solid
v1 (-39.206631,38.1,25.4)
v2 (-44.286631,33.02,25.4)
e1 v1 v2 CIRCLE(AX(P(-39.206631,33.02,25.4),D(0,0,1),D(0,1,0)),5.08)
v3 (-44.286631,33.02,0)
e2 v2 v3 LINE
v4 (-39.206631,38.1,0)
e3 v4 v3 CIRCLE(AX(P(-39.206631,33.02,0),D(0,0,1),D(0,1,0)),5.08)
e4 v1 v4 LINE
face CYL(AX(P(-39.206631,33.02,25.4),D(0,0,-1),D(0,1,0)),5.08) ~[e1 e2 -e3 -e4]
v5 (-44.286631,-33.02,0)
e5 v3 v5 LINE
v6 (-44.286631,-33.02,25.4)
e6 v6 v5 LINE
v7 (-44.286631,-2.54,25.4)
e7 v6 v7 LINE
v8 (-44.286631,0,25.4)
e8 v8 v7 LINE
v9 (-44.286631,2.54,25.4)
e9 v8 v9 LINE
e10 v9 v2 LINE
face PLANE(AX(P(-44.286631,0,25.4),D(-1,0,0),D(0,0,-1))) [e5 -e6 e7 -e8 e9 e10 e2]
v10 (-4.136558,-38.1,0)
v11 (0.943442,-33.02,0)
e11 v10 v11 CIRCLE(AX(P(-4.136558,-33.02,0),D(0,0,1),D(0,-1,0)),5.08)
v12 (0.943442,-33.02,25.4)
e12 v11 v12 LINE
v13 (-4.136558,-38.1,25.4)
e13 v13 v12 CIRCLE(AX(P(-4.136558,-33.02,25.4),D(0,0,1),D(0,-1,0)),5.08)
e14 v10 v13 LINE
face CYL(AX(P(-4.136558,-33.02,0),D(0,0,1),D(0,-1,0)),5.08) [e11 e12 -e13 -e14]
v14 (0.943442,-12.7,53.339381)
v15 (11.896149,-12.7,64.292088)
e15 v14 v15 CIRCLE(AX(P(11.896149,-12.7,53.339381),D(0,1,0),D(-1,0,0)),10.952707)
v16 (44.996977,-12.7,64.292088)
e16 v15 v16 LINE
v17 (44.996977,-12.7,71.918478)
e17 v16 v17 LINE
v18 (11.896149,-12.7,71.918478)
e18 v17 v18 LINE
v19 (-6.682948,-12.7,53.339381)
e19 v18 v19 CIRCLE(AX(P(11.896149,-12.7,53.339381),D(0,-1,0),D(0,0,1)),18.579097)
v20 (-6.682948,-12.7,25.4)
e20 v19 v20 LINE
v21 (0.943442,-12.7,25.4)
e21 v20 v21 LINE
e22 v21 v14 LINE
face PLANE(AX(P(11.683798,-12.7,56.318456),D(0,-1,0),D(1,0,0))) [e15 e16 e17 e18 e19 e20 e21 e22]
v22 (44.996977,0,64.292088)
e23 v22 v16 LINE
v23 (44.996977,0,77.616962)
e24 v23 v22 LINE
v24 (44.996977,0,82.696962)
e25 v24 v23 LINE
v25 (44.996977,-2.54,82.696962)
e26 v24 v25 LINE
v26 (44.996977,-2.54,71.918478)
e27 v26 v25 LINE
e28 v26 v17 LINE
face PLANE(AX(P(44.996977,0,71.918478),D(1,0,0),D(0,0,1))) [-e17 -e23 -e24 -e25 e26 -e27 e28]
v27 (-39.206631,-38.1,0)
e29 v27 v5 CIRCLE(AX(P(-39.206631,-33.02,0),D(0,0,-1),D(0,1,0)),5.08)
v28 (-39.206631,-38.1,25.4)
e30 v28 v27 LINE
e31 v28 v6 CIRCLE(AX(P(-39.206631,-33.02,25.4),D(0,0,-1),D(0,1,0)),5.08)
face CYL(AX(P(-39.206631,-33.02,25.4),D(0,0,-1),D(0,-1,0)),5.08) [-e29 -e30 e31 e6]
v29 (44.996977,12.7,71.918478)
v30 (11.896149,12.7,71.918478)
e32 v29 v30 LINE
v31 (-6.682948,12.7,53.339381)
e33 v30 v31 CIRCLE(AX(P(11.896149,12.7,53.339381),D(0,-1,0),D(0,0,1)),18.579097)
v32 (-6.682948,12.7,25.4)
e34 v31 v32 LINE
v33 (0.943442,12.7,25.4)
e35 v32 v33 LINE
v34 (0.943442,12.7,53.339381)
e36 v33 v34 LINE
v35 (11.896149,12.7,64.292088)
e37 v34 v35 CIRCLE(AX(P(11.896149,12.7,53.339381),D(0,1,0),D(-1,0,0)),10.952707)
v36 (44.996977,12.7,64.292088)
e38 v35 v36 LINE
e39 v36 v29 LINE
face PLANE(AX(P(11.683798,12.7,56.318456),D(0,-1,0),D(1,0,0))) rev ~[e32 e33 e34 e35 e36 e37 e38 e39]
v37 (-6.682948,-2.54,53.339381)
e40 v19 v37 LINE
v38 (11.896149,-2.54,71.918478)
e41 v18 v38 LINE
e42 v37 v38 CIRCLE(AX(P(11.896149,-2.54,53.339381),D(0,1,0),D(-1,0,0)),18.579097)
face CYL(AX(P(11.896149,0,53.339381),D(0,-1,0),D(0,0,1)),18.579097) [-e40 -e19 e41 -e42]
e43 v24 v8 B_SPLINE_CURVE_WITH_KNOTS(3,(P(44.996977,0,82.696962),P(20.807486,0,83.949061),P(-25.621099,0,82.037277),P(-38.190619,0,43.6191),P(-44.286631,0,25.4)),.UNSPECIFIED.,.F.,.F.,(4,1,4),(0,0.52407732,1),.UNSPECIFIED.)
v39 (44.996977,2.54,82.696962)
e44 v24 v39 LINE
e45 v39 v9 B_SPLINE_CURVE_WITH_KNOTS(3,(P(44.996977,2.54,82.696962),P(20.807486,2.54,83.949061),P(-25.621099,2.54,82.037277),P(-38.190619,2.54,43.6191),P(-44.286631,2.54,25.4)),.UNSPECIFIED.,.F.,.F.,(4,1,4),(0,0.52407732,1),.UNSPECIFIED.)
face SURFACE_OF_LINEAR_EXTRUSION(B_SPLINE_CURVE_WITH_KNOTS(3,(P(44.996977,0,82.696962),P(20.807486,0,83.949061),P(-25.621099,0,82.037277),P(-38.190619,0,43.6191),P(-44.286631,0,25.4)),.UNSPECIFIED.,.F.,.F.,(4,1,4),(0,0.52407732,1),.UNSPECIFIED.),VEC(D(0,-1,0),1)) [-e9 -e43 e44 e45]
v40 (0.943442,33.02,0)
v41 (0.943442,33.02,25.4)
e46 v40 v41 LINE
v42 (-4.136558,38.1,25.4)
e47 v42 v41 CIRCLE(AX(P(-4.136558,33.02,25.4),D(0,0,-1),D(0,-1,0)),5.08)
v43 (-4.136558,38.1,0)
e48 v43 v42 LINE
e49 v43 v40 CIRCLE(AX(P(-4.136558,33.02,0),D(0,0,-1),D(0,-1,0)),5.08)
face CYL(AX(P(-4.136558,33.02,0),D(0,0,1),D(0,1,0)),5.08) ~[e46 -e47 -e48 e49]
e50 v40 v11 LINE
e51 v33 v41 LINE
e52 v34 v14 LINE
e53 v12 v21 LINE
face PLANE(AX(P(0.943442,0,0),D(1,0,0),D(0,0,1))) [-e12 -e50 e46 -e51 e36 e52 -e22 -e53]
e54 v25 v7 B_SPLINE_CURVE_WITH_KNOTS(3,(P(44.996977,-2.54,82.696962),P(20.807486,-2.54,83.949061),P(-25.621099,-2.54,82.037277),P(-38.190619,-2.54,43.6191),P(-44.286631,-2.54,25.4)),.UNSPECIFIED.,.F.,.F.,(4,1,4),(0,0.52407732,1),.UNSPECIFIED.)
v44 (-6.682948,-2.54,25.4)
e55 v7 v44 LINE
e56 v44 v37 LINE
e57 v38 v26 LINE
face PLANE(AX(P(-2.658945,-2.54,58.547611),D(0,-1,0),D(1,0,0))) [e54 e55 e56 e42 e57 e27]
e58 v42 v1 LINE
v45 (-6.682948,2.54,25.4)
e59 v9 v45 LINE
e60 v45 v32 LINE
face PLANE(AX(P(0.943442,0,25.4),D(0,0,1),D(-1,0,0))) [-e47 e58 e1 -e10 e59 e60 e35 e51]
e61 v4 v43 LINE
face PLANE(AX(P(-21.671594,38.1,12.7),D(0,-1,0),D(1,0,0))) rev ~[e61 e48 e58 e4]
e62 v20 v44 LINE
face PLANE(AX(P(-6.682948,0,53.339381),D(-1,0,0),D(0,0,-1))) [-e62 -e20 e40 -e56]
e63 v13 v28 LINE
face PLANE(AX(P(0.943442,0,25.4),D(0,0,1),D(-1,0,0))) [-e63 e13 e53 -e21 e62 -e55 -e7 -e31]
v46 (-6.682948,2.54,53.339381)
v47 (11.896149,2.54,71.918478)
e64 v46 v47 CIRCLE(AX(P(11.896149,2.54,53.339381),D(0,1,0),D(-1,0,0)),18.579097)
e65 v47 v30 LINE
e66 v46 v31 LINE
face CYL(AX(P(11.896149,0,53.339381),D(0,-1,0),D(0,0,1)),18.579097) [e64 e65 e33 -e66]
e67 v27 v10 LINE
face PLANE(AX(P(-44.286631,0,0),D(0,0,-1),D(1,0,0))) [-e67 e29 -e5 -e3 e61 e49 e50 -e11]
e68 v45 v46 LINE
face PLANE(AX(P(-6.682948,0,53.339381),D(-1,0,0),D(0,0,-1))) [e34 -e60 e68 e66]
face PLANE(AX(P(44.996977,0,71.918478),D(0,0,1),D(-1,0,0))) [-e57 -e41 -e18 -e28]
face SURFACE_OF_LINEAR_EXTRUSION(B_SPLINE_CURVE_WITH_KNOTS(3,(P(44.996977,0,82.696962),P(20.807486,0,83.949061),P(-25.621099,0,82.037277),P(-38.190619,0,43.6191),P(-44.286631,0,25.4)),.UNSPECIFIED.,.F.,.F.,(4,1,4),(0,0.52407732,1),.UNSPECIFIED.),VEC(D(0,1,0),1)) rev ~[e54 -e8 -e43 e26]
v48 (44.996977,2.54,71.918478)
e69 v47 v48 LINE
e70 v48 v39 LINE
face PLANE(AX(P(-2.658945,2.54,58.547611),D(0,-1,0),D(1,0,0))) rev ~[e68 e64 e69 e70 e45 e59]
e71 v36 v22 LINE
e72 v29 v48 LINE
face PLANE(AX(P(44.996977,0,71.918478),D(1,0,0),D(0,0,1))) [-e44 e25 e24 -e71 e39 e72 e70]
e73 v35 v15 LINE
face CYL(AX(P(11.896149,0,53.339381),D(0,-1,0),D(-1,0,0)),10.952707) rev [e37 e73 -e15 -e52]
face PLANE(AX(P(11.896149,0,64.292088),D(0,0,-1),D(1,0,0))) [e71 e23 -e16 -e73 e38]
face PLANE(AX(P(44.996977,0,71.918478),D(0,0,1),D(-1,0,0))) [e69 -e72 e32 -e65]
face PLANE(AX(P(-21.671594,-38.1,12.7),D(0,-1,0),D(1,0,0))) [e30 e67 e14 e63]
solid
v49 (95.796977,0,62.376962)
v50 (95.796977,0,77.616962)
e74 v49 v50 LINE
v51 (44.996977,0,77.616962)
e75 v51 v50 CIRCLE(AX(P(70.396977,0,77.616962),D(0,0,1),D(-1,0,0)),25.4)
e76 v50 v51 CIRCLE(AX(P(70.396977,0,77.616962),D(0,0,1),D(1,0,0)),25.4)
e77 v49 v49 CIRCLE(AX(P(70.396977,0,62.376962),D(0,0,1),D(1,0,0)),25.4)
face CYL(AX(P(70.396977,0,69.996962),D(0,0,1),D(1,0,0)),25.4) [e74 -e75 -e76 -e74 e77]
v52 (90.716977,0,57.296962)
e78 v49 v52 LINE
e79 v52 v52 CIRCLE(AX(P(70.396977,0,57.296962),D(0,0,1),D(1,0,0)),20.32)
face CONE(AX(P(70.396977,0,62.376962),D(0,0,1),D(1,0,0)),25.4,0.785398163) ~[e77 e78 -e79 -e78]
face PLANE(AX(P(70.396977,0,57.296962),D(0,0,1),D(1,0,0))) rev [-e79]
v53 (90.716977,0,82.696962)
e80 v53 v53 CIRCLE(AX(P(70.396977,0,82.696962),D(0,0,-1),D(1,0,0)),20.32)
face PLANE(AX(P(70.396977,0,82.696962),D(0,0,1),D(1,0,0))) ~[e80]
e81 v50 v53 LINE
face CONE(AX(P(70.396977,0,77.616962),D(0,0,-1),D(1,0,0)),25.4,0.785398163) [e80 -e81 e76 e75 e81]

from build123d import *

# Parameters (mm, degrees)
F1_DEPTH    = 38.1
F2_DEPTH    = 2.54
F0_W        = 25.4
F0_H        = 25.4
F4_DEPTH    = 12.7
F5_R        = 5.08
F6_T2_ANGLE = 180
F6_T4_ANGLE = 180


# Not quite as in the source:
# - a fillet or chamfer that OpenCascade refuses, or shapes differently, is made with other operations: its cross-section is extruded or revolved along the edge and cut away or added


with BuildPart() as f1:
    # F0 (on Front) → F1 (new body, symmetric)
    with BuildSketch(Plane.XZ):
        Polygon((-44.2866310477, 25.4), (-44.2866310477, 0), (0.9434421729, 0), (0.9434421729, 25.4), (-6.6829477437, 25.4), align=None)
    extrude(amount=F1_DEPTH, both=True)

    # F0 (on Front) → F2 (join, symmetric)
    with BuildSketch(Plane.XZ):
        with BuildLine():
            add(Edge.make_bspline(
                [(44.9969768524, 82.6969615459), (20.8074855996, 83.9490606701), (-25.6210994511, 82.0372772331), (-38.1906192957, 43.6191001085), (-44.2866310477, 25.4)],
                knots=[0, 0, 0, 0, 0.5240773197, 1, 1, 1, 1], degree=3))
            Line((-44.2866310477, 25.4), (-6.6829477437, 25.4))
            Line((-6.6829477437, 25.4), (-6.6829477437, 53.3393811594))
            ThreePointArc((-6.6829477437, 53.3393811594), (-1.2412562476, 66.4767865715), (11.8961491644, 71.9184780675))
            Line((11.8961491644, 71.9184780675), (44.9969768524, 71.9184780675))
            Line((44.9969768524, 71.9184780675), (44.9969768524, 82.6969615459))
        make_face()
    extrude(amount=F2_DEPTH, both=True)

    # F0 (on Front) → F3 (revolve)
    with BuildSketch(Plane.XZ):
        with Locations((83.0969768524, 69.9969615459)):
            Rectangle(F0_W, F0_H)
    revolve(axis=Axis((70.3969768524, 0, 69.9969615459), (0, 0, 1)))

    # F0 (on Front) → F4 (join, symmetric)
    with BuildSketch(Plane.XZ):
        with BuildLine():
            Line((-6.6829477437, 25.4), (0.9434421729, 25.4))
            Line((0.9434421729, 25.4), (0.9434421729, 53.3393811594))
            ThreePointArc((0.9434421729, 53.3393811594), (4.1514157783, 61.0841145455), (11.8961491644, 64.292088151))
            Line((11.8961491644, 64.292088151), (44.9969768524, 64.292088151))
            Line((44.9969768524, 64.292088151), (44.9969768524, 71.9184780675))
            Line((44.9969768524, 71.9184780675), (11.8961491644, 71.9184780675))
            ThreePointArc((11.8961491644, 71.9184780675), (-1.2412562476, 66.4767865715), (-6.6829477437, 53.3393811594))
            Line((-6.6829477437, 53.3393811594), (-6.6829477437, 25.4))
        make_face()
    extrude(amount=F4_DEPTH, both=True)

    # F5
    f5_edges = [f1.edges().sort_by_distance(p)[0] for p in [
        (-44.286631, -38.1, 12.7),
        (0.943442, -38.1, 12.7),
        (0.943442, 38.1, 12.7),
        (-44.286631, 38.1, 12.7),
    ]]
    fillet(f5_edges, radius=F5_R)

    # F6: chamfer of 5.08 on 3 edges, made by hand

    # F6_s1 → F6_t2 (revolve, cut)
    with BuildSketch(Plane.XZ):
        Polygon((95.7969768524, 77.6169615459), (90.7169768524, 82.6969615459), (95.7969768524, 82.6969615459), align=None)
    revolve(axis=Axis((70.3969768524, 0, 82.6969615459), (0, 0, 1)), revolution_arc=F6_T2_ANGLE, mode=Mode.SUBTRACT)

    # F6_s3 → F6_t4 (revolve, cut)
    with BuildSketch(Plane.XZ):
        Polygon((44.9969768524, 77.6169615459), (50.0769768524, 82.6969615459), (44.9969768524, 82.6969615459), align=None)
    revolve(axis=Axis((70.3969768524, 0, 82.6969615459), (0, 0, 1)), revolution_arc=F6_T4_ANGLE, mode=Mode.SUBTRACT)

    # F6_s5 → F6_t6 (revolve, cut)
    with BuildSketch(Plane.XZ):
        Polygon((95.7969768524, 62.3769615459), (90.7169768524, 57.2969615459), (95.7969768524, 57.2969615459), align=None)
    revolve(axis=Axis((70.3969768524, 0, 57.2969615459), (0, 0, 1)), mode=Mode.SUBTRACT)


solid = f1.part
